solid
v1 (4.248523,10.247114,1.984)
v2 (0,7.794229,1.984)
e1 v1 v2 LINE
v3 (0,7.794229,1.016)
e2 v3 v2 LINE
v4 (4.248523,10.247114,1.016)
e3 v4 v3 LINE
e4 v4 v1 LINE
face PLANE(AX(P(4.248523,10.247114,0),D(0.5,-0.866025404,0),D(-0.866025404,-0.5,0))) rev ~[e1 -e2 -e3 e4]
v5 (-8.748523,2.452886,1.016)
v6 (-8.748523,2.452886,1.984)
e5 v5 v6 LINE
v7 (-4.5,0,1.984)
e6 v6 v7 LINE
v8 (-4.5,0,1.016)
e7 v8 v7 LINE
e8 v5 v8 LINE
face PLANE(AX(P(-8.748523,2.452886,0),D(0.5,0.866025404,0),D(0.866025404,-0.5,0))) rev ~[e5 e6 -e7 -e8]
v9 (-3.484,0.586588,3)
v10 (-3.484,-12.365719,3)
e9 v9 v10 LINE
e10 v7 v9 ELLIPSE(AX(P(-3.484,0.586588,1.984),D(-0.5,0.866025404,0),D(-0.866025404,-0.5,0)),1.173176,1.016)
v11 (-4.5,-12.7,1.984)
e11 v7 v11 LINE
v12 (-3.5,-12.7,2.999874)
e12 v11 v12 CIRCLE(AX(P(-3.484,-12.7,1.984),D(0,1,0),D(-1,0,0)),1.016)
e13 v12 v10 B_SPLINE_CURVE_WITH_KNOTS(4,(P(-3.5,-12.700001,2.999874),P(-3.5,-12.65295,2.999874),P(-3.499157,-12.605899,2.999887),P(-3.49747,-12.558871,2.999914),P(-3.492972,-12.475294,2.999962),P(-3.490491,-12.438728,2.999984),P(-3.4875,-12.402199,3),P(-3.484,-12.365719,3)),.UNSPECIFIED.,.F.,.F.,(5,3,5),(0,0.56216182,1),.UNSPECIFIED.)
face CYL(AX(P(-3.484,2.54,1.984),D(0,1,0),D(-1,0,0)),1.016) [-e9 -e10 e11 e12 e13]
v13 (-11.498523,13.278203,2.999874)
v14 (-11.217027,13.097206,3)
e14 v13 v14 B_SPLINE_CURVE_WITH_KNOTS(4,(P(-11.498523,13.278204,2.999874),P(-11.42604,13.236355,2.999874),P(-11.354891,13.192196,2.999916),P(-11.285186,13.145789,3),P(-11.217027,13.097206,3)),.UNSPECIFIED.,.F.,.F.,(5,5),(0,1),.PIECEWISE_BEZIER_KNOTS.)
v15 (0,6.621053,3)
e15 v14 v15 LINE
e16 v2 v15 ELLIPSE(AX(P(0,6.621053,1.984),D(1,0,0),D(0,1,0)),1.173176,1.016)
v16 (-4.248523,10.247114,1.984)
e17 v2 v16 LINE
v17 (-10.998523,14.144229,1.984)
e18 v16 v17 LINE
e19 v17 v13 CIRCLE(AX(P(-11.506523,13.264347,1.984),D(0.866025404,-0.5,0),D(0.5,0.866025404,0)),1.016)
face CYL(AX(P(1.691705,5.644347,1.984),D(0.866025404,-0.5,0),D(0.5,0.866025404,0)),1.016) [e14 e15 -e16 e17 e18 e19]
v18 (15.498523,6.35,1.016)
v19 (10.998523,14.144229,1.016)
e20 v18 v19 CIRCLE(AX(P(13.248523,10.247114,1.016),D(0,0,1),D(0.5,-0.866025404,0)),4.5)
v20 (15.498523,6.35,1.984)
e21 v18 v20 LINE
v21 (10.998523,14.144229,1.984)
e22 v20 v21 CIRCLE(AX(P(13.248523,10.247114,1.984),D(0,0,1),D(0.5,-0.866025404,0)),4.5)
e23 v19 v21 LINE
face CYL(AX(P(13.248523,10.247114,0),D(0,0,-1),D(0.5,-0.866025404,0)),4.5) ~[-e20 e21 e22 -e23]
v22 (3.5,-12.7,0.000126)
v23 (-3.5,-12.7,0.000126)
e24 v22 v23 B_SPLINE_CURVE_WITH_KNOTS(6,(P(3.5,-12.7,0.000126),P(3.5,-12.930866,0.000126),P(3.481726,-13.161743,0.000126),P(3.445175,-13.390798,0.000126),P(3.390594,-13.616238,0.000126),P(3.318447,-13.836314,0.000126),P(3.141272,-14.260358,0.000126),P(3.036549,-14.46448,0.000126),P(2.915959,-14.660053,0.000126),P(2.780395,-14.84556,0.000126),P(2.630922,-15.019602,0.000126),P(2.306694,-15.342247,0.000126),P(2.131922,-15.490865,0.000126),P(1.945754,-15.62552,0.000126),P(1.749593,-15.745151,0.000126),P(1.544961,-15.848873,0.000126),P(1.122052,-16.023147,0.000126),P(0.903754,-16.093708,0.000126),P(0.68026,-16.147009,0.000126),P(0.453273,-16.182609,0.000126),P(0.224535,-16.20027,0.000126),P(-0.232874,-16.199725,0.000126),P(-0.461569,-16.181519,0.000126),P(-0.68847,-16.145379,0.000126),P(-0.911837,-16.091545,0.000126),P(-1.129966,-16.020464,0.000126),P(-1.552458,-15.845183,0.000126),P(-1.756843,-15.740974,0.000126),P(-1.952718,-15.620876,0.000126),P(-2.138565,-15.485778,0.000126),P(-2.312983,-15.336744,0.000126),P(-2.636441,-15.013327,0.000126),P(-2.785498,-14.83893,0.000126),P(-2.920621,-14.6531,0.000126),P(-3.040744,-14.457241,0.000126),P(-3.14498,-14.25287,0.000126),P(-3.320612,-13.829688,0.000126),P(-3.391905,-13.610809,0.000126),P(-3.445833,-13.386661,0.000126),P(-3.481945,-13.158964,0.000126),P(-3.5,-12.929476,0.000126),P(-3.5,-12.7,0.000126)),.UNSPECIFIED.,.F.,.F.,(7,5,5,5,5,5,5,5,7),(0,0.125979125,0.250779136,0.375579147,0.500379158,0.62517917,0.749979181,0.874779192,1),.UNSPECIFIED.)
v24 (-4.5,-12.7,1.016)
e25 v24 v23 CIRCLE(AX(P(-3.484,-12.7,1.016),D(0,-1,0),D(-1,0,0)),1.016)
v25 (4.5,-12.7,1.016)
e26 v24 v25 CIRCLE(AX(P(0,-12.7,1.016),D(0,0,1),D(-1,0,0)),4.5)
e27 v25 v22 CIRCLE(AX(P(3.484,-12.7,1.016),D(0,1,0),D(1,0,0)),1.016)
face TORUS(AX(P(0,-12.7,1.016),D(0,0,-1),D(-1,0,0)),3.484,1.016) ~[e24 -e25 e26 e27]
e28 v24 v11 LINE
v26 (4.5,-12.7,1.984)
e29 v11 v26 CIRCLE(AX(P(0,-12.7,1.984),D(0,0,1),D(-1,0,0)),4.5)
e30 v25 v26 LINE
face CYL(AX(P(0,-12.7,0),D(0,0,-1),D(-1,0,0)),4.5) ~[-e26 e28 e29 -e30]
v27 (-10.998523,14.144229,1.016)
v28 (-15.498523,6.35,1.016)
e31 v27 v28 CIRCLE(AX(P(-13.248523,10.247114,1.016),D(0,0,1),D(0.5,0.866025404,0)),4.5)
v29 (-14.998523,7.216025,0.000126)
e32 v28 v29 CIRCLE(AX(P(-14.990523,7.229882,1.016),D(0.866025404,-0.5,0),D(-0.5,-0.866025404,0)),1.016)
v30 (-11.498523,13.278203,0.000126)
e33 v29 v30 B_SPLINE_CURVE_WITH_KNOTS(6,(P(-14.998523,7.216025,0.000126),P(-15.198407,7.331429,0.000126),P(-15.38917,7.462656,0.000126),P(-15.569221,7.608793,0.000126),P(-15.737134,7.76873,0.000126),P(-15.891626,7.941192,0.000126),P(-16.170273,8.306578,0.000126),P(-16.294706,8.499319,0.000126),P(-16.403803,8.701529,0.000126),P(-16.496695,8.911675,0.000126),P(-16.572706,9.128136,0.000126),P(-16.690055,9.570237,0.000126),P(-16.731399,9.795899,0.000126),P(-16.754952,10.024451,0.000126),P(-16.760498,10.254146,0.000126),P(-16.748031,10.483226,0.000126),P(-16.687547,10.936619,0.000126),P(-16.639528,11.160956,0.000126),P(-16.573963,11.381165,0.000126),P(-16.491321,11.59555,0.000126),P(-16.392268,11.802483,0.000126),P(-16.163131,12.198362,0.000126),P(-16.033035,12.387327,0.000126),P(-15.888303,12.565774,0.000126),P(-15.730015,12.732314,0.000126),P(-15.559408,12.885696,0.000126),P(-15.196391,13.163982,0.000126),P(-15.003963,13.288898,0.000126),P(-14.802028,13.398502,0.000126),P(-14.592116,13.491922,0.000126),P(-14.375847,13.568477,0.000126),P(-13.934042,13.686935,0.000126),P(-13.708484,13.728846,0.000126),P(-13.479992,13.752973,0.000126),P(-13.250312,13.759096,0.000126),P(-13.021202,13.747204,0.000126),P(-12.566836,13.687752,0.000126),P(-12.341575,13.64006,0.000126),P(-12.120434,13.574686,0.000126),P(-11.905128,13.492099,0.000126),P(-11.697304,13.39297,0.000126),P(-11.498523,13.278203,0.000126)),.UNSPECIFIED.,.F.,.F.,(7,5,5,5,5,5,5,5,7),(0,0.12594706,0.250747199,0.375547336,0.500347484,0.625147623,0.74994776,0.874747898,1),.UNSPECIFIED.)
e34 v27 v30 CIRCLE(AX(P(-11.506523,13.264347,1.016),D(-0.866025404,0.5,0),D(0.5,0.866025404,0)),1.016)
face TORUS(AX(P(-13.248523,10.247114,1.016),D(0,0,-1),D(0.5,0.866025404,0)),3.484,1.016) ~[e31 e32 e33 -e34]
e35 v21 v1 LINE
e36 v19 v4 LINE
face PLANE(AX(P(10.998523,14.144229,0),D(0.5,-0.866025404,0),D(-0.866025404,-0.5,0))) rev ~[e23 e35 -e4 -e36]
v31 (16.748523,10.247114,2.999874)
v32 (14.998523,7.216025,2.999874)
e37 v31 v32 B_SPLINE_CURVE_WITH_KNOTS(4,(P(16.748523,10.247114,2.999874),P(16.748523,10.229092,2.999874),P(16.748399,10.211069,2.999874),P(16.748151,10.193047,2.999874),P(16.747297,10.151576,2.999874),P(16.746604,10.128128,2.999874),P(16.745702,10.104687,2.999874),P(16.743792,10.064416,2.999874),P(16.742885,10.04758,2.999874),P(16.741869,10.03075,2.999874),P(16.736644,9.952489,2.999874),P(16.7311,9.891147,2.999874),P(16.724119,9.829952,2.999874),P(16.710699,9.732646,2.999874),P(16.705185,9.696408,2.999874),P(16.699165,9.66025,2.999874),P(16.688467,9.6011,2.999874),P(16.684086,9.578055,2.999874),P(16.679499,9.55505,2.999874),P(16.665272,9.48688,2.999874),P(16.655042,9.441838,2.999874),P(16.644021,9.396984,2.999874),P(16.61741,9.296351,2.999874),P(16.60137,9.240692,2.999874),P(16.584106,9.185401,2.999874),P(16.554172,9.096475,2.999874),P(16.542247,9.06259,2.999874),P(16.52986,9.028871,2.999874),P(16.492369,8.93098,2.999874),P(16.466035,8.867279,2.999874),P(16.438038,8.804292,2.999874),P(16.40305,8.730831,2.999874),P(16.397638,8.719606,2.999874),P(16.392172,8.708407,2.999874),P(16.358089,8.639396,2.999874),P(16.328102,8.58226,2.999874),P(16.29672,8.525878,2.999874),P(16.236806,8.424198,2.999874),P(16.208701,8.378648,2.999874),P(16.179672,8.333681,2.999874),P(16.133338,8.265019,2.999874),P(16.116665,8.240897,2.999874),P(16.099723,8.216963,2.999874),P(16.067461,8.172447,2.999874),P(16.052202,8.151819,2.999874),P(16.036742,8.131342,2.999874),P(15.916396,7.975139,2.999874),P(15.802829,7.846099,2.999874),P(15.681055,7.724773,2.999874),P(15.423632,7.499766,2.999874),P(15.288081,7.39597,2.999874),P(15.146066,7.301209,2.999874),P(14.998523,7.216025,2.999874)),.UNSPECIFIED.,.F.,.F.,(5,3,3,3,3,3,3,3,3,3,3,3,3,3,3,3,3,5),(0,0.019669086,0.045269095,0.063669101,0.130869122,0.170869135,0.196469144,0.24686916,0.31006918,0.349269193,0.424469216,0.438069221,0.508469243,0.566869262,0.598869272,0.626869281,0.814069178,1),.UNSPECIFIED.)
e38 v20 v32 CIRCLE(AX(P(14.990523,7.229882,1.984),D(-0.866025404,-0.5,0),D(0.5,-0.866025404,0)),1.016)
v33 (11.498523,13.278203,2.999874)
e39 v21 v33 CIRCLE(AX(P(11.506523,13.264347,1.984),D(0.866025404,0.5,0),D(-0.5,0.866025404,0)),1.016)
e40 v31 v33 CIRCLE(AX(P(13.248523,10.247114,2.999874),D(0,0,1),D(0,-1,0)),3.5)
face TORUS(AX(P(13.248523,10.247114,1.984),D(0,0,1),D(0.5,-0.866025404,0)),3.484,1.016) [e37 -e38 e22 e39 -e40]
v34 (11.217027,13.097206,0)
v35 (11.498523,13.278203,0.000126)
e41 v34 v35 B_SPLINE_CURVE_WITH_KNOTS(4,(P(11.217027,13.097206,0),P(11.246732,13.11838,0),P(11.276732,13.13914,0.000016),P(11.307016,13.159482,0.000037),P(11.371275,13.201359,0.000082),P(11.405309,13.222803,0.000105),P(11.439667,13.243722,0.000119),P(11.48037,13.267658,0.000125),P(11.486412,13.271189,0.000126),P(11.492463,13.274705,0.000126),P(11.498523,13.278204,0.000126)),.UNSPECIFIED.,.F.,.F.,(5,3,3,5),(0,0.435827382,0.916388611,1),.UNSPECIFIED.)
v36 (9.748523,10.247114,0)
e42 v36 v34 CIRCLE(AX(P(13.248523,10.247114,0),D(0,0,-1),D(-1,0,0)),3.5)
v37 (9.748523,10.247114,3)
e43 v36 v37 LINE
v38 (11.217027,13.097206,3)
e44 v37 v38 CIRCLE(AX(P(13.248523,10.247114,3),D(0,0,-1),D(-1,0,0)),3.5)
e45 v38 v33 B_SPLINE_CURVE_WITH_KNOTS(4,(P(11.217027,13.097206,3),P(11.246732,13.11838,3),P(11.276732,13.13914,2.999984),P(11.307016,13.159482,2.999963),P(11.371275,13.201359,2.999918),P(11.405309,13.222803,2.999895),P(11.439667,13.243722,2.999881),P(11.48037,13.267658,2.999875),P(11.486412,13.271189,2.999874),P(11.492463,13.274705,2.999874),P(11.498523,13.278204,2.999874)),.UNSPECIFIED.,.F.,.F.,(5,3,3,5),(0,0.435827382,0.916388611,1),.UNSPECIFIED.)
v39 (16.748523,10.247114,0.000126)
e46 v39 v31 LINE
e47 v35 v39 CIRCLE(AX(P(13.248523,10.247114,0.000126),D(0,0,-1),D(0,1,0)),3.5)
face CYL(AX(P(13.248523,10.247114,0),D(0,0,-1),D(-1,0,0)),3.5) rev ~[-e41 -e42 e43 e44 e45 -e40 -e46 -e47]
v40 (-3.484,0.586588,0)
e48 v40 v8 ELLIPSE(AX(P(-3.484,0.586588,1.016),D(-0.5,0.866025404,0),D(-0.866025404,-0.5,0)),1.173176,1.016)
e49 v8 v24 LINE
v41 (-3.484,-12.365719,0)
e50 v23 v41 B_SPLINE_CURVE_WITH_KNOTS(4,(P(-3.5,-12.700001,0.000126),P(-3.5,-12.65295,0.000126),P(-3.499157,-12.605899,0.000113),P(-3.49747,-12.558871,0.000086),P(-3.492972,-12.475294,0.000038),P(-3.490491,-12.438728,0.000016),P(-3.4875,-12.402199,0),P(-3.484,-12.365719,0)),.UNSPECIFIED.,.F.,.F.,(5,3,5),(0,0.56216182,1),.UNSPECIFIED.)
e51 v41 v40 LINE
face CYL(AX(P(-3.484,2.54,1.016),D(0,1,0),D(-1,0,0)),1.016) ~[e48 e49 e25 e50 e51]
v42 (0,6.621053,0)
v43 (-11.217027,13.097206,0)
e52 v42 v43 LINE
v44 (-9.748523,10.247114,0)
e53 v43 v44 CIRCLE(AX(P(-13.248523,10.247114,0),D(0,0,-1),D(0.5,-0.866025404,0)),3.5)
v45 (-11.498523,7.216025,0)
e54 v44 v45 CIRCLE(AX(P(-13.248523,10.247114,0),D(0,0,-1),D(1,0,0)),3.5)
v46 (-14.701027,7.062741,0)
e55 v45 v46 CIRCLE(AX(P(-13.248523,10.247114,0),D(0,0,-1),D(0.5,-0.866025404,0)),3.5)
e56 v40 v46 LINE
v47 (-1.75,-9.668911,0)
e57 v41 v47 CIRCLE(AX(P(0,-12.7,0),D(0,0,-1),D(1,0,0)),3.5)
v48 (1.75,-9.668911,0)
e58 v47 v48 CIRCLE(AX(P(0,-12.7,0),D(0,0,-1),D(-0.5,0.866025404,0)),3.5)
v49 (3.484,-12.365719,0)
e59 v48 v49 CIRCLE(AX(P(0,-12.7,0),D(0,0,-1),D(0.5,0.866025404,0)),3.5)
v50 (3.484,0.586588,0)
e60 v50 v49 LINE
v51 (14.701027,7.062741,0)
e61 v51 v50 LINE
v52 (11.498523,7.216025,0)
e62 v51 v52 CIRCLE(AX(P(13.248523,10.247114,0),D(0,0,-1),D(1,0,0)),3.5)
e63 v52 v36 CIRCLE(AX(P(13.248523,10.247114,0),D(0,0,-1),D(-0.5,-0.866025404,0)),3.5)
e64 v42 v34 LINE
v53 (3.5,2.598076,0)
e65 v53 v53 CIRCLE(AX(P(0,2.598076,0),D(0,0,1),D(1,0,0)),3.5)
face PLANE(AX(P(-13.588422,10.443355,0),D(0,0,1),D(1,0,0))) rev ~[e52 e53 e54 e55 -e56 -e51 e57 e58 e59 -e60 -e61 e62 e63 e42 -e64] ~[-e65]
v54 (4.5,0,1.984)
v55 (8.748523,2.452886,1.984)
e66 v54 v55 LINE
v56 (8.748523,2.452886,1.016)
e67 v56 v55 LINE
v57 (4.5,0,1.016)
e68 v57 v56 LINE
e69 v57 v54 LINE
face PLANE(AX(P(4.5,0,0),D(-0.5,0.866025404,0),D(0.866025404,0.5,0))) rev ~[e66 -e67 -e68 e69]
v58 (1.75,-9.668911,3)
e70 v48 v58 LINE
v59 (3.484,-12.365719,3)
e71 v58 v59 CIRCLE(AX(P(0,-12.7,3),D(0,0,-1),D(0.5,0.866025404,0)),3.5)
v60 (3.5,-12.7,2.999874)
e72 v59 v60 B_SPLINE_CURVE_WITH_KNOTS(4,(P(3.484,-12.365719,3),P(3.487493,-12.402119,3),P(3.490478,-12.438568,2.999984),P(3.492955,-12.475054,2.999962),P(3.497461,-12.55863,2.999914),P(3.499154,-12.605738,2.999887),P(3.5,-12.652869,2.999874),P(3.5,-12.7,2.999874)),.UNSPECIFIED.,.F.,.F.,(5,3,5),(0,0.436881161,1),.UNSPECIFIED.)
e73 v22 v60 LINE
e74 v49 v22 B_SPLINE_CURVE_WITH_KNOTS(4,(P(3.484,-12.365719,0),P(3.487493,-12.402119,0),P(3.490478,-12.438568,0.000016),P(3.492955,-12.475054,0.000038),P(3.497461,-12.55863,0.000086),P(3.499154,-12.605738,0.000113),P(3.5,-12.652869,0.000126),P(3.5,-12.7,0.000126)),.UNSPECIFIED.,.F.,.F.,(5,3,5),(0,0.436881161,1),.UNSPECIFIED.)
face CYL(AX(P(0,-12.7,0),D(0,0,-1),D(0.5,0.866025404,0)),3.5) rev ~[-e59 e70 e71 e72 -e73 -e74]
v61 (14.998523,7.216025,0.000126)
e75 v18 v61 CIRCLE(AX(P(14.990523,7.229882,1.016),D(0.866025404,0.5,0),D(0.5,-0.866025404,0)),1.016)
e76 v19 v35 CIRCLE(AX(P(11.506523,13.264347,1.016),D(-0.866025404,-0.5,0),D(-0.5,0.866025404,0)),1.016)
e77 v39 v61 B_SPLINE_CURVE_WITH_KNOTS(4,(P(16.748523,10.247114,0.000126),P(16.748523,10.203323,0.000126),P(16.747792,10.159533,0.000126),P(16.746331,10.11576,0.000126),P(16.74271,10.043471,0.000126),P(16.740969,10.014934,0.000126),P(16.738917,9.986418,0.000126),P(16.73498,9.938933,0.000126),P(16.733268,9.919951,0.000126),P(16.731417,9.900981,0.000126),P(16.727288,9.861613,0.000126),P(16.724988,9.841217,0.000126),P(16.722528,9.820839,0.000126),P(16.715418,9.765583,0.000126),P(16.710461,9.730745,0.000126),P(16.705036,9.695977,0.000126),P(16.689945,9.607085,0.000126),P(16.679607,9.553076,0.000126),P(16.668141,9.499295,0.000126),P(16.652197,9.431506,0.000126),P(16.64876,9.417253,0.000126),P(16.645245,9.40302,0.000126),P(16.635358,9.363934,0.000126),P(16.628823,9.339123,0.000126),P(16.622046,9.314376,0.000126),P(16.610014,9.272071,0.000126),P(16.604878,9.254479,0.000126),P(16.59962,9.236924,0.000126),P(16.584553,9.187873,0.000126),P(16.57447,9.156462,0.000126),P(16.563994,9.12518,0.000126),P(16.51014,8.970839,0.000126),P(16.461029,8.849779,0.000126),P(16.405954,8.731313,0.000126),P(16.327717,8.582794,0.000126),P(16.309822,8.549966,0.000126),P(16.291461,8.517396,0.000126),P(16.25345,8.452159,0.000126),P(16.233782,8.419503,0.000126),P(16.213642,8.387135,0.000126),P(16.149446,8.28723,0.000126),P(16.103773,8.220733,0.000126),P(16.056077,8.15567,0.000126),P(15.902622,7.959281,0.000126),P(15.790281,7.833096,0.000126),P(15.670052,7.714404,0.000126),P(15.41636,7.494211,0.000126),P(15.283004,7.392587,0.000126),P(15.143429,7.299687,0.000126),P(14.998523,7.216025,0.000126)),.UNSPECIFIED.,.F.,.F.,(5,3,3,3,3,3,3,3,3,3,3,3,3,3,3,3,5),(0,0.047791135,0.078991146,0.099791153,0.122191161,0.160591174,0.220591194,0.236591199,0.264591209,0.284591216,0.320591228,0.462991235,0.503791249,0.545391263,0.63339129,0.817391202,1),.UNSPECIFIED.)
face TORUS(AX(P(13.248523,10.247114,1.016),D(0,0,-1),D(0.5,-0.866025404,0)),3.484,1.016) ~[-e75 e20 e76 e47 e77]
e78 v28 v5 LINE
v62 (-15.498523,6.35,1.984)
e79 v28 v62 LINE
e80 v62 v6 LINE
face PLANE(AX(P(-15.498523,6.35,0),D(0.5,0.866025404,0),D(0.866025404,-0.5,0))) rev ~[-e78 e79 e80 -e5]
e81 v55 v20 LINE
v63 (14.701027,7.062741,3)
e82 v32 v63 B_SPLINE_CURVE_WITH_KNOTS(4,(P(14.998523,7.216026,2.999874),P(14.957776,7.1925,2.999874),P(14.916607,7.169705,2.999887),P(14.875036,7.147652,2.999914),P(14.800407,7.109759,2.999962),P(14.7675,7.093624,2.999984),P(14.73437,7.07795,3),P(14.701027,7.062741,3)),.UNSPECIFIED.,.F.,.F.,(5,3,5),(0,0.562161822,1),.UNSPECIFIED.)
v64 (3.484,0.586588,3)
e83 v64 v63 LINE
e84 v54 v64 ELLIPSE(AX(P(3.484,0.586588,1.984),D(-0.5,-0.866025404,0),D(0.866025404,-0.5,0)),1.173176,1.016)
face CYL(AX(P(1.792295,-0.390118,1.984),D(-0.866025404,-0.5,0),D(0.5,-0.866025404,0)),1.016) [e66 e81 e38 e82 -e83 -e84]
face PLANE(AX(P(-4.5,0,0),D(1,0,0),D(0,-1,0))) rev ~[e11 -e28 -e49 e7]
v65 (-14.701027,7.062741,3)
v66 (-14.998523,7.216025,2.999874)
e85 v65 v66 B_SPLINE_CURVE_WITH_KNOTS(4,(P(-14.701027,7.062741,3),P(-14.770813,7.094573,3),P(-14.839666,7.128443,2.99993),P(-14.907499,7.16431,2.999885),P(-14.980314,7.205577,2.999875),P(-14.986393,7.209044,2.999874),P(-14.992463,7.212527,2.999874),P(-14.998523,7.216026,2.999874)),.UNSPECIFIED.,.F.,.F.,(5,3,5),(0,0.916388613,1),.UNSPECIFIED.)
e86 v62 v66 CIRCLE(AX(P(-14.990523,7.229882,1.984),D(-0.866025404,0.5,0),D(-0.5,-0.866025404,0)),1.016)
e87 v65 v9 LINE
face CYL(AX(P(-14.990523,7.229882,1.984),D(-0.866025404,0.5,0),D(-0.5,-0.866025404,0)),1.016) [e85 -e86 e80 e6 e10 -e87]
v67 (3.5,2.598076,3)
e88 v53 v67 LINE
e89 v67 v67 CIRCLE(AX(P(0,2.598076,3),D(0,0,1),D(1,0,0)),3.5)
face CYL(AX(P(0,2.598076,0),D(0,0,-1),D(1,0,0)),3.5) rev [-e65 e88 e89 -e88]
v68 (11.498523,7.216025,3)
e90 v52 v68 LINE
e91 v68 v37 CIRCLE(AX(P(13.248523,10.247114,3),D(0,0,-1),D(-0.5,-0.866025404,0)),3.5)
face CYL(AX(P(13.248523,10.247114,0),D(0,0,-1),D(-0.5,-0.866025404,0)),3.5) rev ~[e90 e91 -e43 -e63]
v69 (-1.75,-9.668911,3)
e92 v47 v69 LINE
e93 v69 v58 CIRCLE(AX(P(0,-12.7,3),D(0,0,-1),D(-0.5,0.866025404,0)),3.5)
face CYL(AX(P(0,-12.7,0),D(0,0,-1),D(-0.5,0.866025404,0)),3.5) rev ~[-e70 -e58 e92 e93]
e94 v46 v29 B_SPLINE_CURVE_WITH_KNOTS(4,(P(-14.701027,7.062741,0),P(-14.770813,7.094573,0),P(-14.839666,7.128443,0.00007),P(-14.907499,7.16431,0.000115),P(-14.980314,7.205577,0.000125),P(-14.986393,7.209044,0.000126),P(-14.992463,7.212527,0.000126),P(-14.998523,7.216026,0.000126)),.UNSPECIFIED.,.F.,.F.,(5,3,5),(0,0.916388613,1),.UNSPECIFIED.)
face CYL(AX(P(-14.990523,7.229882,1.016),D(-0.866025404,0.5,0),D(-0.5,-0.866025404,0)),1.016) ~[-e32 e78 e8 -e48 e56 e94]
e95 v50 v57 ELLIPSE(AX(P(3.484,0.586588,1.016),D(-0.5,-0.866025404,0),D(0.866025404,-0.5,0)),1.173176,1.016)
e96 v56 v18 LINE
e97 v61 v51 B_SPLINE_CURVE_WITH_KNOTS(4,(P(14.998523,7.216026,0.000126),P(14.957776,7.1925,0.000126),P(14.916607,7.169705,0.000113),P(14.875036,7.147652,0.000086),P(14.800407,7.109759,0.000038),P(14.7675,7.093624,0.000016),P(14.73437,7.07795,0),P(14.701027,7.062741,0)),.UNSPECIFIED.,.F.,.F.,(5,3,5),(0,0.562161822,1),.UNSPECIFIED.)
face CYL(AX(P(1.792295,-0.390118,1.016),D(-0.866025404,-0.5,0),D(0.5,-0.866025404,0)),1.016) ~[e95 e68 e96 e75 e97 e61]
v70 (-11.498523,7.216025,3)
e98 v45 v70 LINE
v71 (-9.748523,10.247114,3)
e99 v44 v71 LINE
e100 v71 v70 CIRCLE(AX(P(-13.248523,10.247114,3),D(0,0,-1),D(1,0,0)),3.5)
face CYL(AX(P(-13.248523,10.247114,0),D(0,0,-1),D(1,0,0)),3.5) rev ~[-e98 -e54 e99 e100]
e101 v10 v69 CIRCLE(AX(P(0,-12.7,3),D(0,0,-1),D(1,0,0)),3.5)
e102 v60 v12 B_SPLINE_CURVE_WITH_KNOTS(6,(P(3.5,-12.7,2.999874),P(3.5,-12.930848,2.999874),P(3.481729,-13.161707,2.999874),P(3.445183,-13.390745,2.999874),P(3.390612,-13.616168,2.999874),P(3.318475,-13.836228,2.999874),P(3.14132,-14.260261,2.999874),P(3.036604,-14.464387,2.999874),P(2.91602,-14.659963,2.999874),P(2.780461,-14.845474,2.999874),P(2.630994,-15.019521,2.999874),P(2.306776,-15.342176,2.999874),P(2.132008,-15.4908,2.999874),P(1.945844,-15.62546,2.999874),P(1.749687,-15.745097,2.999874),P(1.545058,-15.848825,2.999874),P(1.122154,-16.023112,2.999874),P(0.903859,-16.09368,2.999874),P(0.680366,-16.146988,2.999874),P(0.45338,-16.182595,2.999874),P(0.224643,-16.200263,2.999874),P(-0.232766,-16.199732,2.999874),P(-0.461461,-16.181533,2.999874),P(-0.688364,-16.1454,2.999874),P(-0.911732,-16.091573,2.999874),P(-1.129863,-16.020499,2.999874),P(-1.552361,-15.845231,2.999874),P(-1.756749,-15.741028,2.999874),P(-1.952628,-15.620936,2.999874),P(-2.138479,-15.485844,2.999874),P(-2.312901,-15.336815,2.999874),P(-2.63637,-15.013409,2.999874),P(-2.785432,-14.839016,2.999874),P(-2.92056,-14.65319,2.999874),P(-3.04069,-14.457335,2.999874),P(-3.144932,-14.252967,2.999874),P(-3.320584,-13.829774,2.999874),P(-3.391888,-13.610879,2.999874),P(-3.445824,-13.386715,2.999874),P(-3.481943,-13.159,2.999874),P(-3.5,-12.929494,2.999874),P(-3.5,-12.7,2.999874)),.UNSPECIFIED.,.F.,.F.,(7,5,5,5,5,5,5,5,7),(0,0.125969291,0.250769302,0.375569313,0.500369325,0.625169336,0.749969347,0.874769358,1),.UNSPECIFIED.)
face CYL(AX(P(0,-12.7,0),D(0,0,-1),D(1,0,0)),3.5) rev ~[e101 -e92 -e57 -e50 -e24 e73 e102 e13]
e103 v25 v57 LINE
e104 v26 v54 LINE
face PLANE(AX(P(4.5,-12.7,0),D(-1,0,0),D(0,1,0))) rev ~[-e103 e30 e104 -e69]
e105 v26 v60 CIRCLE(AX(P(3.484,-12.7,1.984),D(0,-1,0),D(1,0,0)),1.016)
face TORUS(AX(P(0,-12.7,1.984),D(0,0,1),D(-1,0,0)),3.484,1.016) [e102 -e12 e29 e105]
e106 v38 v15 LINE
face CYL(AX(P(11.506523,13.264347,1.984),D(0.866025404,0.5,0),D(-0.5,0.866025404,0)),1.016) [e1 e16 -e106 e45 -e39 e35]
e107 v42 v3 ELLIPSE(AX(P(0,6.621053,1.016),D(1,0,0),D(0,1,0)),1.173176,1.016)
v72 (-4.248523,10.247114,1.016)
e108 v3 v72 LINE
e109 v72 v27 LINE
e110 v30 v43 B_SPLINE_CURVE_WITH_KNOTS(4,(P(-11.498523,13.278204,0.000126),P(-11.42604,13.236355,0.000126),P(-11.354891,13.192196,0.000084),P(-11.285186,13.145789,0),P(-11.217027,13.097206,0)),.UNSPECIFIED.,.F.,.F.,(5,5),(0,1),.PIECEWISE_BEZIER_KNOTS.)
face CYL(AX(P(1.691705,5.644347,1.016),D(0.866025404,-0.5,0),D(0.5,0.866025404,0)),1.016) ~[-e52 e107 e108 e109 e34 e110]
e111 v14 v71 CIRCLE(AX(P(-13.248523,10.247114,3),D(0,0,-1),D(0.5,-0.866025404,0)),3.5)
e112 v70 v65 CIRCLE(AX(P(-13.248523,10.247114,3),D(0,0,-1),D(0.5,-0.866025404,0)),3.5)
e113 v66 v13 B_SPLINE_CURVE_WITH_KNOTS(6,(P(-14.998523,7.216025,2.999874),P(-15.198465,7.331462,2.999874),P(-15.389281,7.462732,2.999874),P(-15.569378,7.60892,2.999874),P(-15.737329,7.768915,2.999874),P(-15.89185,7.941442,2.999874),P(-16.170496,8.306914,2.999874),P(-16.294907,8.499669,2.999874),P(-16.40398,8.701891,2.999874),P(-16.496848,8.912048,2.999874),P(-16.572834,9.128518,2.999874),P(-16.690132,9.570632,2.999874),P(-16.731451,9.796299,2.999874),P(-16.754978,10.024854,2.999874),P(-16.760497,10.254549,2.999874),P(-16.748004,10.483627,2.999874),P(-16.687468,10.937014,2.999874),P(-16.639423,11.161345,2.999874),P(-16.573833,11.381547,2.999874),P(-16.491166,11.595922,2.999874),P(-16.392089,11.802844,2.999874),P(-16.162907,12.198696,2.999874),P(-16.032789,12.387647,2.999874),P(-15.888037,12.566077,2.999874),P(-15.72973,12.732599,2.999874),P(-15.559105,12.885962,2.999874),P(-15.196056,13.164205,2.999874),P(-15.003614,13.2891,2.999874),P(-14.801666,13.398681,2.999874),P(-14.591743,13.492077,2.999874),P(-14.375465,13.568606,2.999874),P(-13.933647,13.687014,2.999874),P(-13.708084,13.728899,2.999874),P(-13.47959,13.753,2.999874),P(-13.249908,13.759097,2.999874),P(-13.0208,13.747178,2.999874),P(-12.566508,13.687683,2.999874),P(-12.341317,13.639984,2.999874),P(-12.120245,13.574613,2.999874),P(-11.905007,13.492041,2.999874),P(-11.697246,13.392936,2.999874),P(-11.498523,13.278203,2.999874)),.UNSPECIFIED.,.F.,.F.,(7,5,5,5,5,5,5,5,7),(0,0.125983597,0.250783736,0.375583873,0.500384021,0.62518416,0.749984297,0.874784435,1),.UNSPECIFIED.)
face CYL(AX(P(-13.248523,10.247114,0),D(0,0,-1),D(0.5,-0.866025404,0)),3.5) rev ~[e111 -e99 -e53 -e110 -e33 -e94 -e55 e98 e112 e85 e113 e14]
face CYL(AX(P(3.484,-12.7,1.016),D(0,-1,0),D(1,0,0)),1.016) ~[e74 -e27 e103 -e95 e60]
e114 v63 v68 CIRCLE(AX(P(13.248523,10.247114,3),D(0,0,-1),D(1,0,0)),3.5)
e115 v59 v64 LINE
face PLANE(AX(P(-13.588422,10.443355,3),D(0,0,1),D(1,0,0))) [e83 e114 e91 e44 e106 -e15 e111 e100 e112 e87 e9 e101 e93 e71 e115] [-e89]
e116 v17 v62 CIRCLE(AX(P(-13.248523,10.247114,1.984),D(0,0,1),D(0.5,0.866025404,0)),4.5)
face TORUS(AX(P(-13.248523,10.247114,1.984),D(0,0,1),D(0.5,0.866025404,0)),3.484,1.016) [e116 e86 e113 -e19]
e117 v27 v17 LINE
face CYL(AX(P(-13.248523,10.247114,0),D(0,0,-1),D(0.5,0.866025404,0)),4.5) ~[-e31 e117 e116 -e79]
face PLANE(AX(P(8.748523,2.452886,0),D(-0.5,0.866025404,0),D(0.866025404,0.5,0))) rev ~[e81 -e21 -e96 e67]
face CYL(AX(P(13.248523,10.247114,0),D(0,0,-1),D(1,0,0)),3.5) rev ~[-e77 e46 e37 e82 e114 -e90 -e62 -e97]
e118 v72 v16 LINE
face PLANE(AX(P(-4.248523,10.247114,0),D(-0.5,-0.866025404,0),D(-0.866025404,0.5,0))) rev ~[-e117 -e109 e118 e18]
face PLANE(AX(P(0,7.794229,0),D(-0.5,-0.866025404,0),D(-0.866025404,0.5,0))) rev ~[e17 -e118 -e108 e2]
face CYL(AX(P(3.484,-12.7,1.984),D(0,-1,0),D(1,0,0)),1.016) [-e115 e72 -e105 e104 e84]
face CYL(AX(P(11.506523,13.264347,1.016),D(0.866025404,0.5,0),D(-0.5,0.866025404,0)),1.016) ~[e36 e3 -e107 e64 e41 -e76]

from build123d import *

# Parameters (mm, degrees)
F0_R          = 3.5
F1_DEPTH      = 3
F2_T4_DEPTH   = 15.24
F2_T9_DEPTH   = 15.24
F2_T14_DEPTH  = 15.24
F2_T19_DEPTH  = 15.24
F2_T24_DEPTH  = 15.24
F2_T29_DEPTH  = 15.24
F2_T32_ANGLE  = 180
F2_T34_ANGLE  = 180
F2_T36_ANGLE  = 180
F2_T40_DEPTH  = 15.24
F2_T45_DEPTH  = 15.24
F2_T50_DEPTH  = 15.24
F2_T55_DEPTH  = 15.24
F2_T58_ANGLE  = 180
F2_T62_DEPTH  = 15.24
F2_T65_ANGLE  = 180
F2_T67_ANGLE  = 180
F2_T71_DEPTH  = 15.24
F2_T77_DEPTH  = 15.24
F2_T81_DEPTH  = 15.24
F2_T88_DEPTH  = 15.24
F2_T92_DEPTH  = 15.24
F2_T99_DEPTH  = 15.24
F2_T103_DEPTH = 15.24
F2_T110_DEPTH = 15.24
F2_T114_DEPTH = 15.24
F2_T121_DEPTH = 15.24
F2_T125_DEPTH = 15.24
F2_T132_DEPTH = 15.24
F2_T136_DEPTH = 15.24


# Not quite as in the source:
# - a fillet or chamfer that OpenCascade refuses, or shapes differently, is made with other operations: its cross-section is extruded or revolved along the edge and cut away or added


with BuildPart() as f1:
    # F0 (on Top) → F1 (new body)
    with BuildSketch(Plane.XY):
        with BuildLine():
            Line((-9.7485226281, 10.247114317), (-8.7485226281, 10.247114317))
            ThreePointArc((-8.7485226281, 10.247114317), (-9.351408311, 12.497114317), (-10.9985226281, 14.1442286341))
            ThreePointArc((-10.9985226281, 14.1442286341), (-17.1456369451, 12.497114317), (-15.4985226281, 6.35))
            ThreePointArc((-15.4985226281, 6.35), (-13.2485226281, 5.747114317), (-10.9985226281, 6.35))
            Line((-10.9985226281, 6.35), (-11.4985226281, 7.2160254038))
            ThreePointArc((-11.4985226281, 7.2160254038), (-16.2796115413, 11.997114317), (-9.7485226281, 10.247114317))
        make_face()
        with BuildLine():
            ThreePointArc((-10.9985226281, 6.35), (-9.351408311, 7.997114317), (-8.7485226281, 10.247114317))
            Line((-8.7485226281, 10.247114317), (-9.7485226281, 10.247114317))
            ThreePointArc((-9.7485226281, 10.247114317), (-10.2174337148, 8.497114317), (-11.4985226281, 7.2160254038))
            Line((-11.4985226281, 7.2160254038), (-10.9985226281, 6.35))
        make_face()
        with BuildLine():
            Line((9.7485226281, 10.247114317), (8.7485226281, 10.247114317))
            ThreePointArc((8.7485226281, 10.247114317), (9.351408311, 7.997114317), (10.9985226281, 6.35))
            Line((10.9985226281, 6.35), (11.4985226281, 7.2160254038))
            ThreePointArc((11.4985226281, 7.2160254038), (10.2174337148, 8.497114317), (9.7485226281, 10.247114317))
        make_face()
        with BuildLine():
            ThreePointArc((17.7485226281, 10.247114317), (15.4985226281, 14.1442286341), (10.9985226281, 14.1442286341))
            ThreePointArc((10.9985226281, 14.1442286341), (9.351408311, 12.497114317), (8.7485226281, 10.247114317))
            Line((8.7485226281, 10.247114317), (9.7485226281, 10.247114317))
            ThreePointArc((9.7485226281, 10.247114317), (13.2485226281, 13.747114317), (16.7485226281, 10.247114317))
            ThreePointArc((16.7485226281, 10.247114317), (14.9985226281, 7.2160254038), (11.4985226281, 7.2160254038))
            Line((11.4985226281, 7.2160254038), (10.9985226281, 6.35))
            ThreePointArc((10.9985226281, 6.35), (13.2485226281, 5.747114317), (15.4985226281, 6.35))
            ThreePointArc((15.4985226281, 6.35), (17.1456369451, 7.997114317), (17.7485226281, 10.247114317))
        make_face()
        with BuildLine():
            ThreePointArc((2.25, -8.802885683), (0, -8.2), (-2.25, -8.802885683))
            Line((-2.25, -8.802885683), (-1.75, -9.6689110868))
            ThreePointArc((-1.75, -9.6689110868), (0, -9.2), (1.75, -9.6689110868))
            Line((1.75, -9.6689110868), (2.25, -8.802885683))
        make_face()
        with BuildLine():
            ThreePointArc((-2.25, -8.802885683), (-3.897114317, -10.45), (-4.5, -12.7))
            ThreePointArc((-4.5, -12.7), (0, -17.2), (4.5, -12.7))
            ThreePointArc((4.5, -12.7), (3.897114317, -10.45), (2.25, -8.802885683))
            Line((2.25, -8.802885683), (1.75, -9.6689110868))
            ThreePointArc((1.75, -9.6689110868), (3.0310889132, -10.95), (3.5, -12.7))
            ThreePointArc((3.5, -12.7), (-1.75, -15.7310889132), (-1.75, -9.6689110868))
            Line((-1.75, -9.6689110868), (-2.25, -8.802885683))
        make_face()
        with BuildLine():
            Line((-4.2485226281, 10.247114317), (-8.7485226281, 10.247114317))
            ThreePointArc((-8.7485226281, 10.247114317), (-9.351408311, 7.997114317), (-10.9985226281, 6.35))
            Line((-10.9985226281, 6.35), (-8.7485226281, 2.452885683))
            Line((-8.7485226281, 2.452885683), (-4.5, 0))
            Line((-4.5, 0), (-4.5, -4.9057713659))
            Line((-4.5, -4.9057713659), (-2.25, -8.802885683))
            ThreePointArc((-2.25, -8.802885683), (0, -8.2), (2.25, -8.802885683))
            Line((2.25, -8.802885683), (4.5, -4.9057713659))
            Line((4.5, -4.9057713659), (4.5, 0))
            Line((4.5, 0), (8.7485226281, 2.452885683))
            Line((8.7485226281, 2.452885683), (10.9985226281, 6.35))
            ThreePointArc((10.9985226281, 6.35), (9.351408311, 7.997114317), (8.7485226281, 10.247114317))
            Line((8.7485226281, 10.247114317), (4.2485226281, 10.247114317))
            Line((4.2485226281, 10.247114317), (0, 7.7942286341))
            Line((0, 7.7942286341), (-4.2485226281, 10.247114317))
        make_face()
        with Locations((0, 2.5980762114)):
            Circle(F0_R, mode=Mode.SUBTRACT)
        with BuildLine():
            Line((-2.25, -8.802885683), (-4.5, -4.9057713659))
            Line((-4.5, -4.9057713659), (-4.5, -12.7))
            ThreePointArc((-4.5, -12.7), (-3.897114317, -10.45), (-2.25, -8.802885683))
        make_face()
        with BuildLine():
            ThreePointArc((2.25, -8.802885683), (3.897114317, -10.45), (4.5, -12.7))
            Line((4.5, -12.7), (4.5, -4.9057713659))
            Line((4.5, -4.9057713659), (2.25, -8.802885683))
        make_face()
        with BuildLine():
            ThreePointArc((15.4985226281, 6.35), (13.2485226281, 5.747114317), (10.9985226281, 6.35))
            Line((10.9985226281, 6.35), (8.7485226281, 2.452885683))
            Line((8.7485226281, 2.452885683), (15.4985226281, 6.35))
        make_face()
        with BuildLine():
            Line((10.9985226281, 14.1442286341), (4.2485226281, 10.247114317))
            Line((4.2485226281, 10.247114317), (8.7485226281, 10.247114317))
            ThreePointArc((8.7485226281, 10.247114317), (9.351408311, 12.497114317), (10.9985226281, 14.1442286341))
        make_face()
        with BuildLine():
            ThreePointArc((-10.9985226281, 14.1442286341), (-9.351408311, 12.497114317), (-8.7485226281, 10.247114317))
            Line((-8.7485226281, 10.247114317), (-4.2485226281, 10.247114317))
            Line((-4.2485226281, 10.247114317), (-10.9985226281, 14.1442286341))
        make_face()
        with BuildLine():
            Line((-8.7485226281, 2.452885683), (-10.9985226281, 6.35))
            ThreePointArc((-10.9985226281, 6.35), (-13.2485226281, 5.747114317), (-15.4985226281, 6.35))
            Line((-15.4985226281, 6.35), (-8.7485226281, 2.452885683))
        make_face()
    extrude(amount=F1_DEPTH)

    # F2: fillet of radius 1.016 on 18 edges, made by hand


with BuildPart() as f2_tool2:
    # F2_s3 → F2_t4 (new body)
    with BuildSketch(Plane(origin=(14.3735226281, 8.2985571585, 0), x_dir=(0, 0, 1), z_dir=(-0.8660254038, -0.5, 0))):
        with BuildLine():
            ThreePointArc((1.984, 6.75), (2.7024204897, 6.4524204897), (3, 5.734))
            Line((3, 5.734), (3, 6.75))
            Line((3, 6.75), (1.984, 6.75))
        make_face()
    extrude(amount=F2_T4_DEPTH)

    split(bisect_by=Plane(origin=(3.375, 5.8456714755, 0), x_dir=(0, 0, 1), z_dir=(0.5, 0.8660254038, 0)), keep=Keep.TOP)


with BuildPart() as f1_1:
    add(f1.part)

    # F2_t1: cut F2_tool2
    add(f2_tool2.part, mode=Mode.SUBTRACT)


with BuildPart() as f2_tool7:
    # F2_s8 → F2_t9 (new body)
    with BuildSketch(Plane(origin=(1.1752954744, 0.6785571585, 0), x_dir=(0, 0, 1), z_dir=(0.8660254038, 0.5, 0))):
        with BuildLine():
            ThreePointArc((1.984, 2.25), (2.7024204897, 1.9524204897), (3, 1.234))
            Line((3, 1.234), (3, 2.25))
            Line((3, 2.25), (1.984, 2.25))
        make_face()
    extrude(amount=F2_T9_DEPTH)

    split(bisect_by=Plane.YZ.offset(4.5), keep=Keep.TOP)


with BuildPart() as f1_2:
    add(f1_1.part)

    # F2_t6: cut F2_tool7
    add(f2_tool7.part, mode=Mode.SUBTRACT)


with BuildPart() as f2_tool12:
    # F2_s13 → F2_t14 (new body)
    with BuildSketch(Plane(origin=(-1.1752954744, 0.6785571585, 0), x_dir=(0, 0, 1), z_dir=(-0.8660254038, 0.5, 0))):
        with BuildLine():
            ThreePointArc((1.984, 6.75), (2.7024204897, 6.4524204897), (3, 5.734))
            Line((3, 5.734), (3, 6.75))
            Line((3, 6.75), (1.984, 6.75))
        make_face()
    extrude(amount=F2_T14_DEPTH)

    split(bisect_by=Plane(origin=(-3.375, 5.8456714755, 0), x_dir=(0, 0, 1), z_dir=(-0.5, 0.8660254038, 0)), keep=Keep.TOP)


with BuildPart() as f1_3:
    add(f1_2.part)

    # F2_t11: cut F2_tool12
    add(f2_tool12.part, mode=Mode.SUBTRACT)


with BuildPart() as f2_tool17:
    # F2_s18 → F2_t19 (new body)
    with BuildSketch(Plane(origin=(-14.3735226281, 8.2985571585, 0), x_dir=(0, 0, 1), z_dir=(0.8660254038, -0.5, 0))):
        with BuildLine():
            ThreePointArc((1.984, 2.25), (2.7024204897, 1.9524204897), (3, 1.234))
            Line((3, 1.234), (3, 2.25))
            Line((3, 2.25), (1.984, 2.25))
        make_face()
    extrude(amount=F2_T19_DEPTH)

    split(bisect_by=Plane.YZ.offset(-4.5), keep=Keep.BOTTOM)


with BuildPart() as f1_4:
    add(f1_3.part)

    # F2_t16: cut F2_tool17
    add(f2_tool17.part, mode=Mode.SUBTRACT)


with BuildPart() as f2_tool22:
    # F2_s23 → F2_t24 (new body)
    with BuildSketch(Plane.XZ.offset(-2.54)):
        with BuildLine():
            ThreePointArc((-4.5, 1.984), (-4.2024204897, 2.7024204897), (-3.484, 3))
            Line((-3.484, 3), (-4.5, 3))
            Line((-4.5, 3), (-4.5, 1.984))
        make_face()
    extrude(amount=F2_T24_DEPTH)

    split(bisect_by=Plane(origin=(-1.125, -1.9485571585, 0), x_dir=(0, 0, 1), z_dir=(-0.5, -0.8660254038, 0)), keep=Keep.TOP)


with BuildPart() as f1_5:
    add(f1_4.part)

    # F2_t21: cut F2_tool22
    add(f2_tool22.part, mode=Mode.SUBTRACT)


with BuildPart() as f2_tool27:
    # F2_s28 → F2_t29 (new body)
    with BuildSketch(Plane.XZ.offset(12.7)):
        with BuildLine():
            ThreePointArc((4.5, 1.984), (4.2024204897, 2.7024204897), (3.484, 3))
            Line((3.484, 3), (4.5, 3))
            Line((4.5, 3), (4.5, 1.984))
        make_face()
    extrude(amount=-F2_T29_DEPTH)

    split(bisect_by=Plane(origin=(1.125, -1.9485571585, 0), x_dir=(0, 0, 1), z_dir=(0.5, -0.8660254038, 0)), keep=Keep.TOP)


with BuildPart() as f1_6:
    add(f1_5.part)

    # F2_t26: cut F2_tool27
    add(f2_tool27.part, mode=Mode.SUBTRACT)

    # F2_s31 → F2_t32 (revolve, cut)
    with BuildSketch(Plane.XZ.offset(12.7)):
        with BuildLine():
            ThreePointArc((-4.5, 1.984), (-4.2024204897, 2.7024204897), (-3.484, 3))
            Line((-3.484, 3), (-4.5, 3))
            Line((-4.5, 3), (-4.5, 1.984))
        make_face()
    revolve(axis=Axis((0, -12.7, 3), (0, 0, 1)), revolution_arc=F2_T32_ANGLE, mode=Mode.SUBTRACT)

    # F2_s33 → F2_t34 (revolve, cut)
    with BuildSketch(Plane(origin=(-14.3735226281, 8.2985571585, 0), x_dir=(0, 0, 1), z_dir=(0.8660254038, -0.5, 0))):
        with BuildLine():
            ThreePointArc((1.984, -6.75), (2.7024204897, -6.4524204897), (3, -5.734))
            Line((3, -5.734), (3, -6.75))
            Line((3, -6.75), (1.984, -6.75))
        make_face()
    revolve(axis=Axis((-13.2485226281, 10.247114317, 3), (0, 0, 1)), revolution_arc=F2_T34_ANGLE, mode=Mode.SUBTRACT)

    # F2_s35 → F2_t36 (revolve, cut)
    with BuildSketch(Plane(origin=(14.3735226281, 8.2985571585, 0), x_dir=(0, 0, 1), z_dir=(-0.8660254038, -0.5, 0))):
        with BuildLine():
            ThreePointArc((1.984, -2.25), (2.7024204897, -1.9524204897), (3, -1.234))
            Line((3, -1.234), (3, -2.25))
            Line((3, -2.25), (1.984, -2.25))
        make_face()
    revolve(axis=Axis((13.2485226281, 10.247114317, 3), (0, 0, 1)), revolution_arc=F2_T36_ANGLE, mode=Mode.SUBTRACT)


with BuildPart() as f2_tool38:
    # F2_s39 → F2_t40 (new body)
    with BuildSketch(Plane(origin=(-14.3735226281, 8.2985571585, 0), x_dir=(0, 0, 1), z_dir=(0.8660254038, -0.5, 0))):
        with BuildLine():
            ThreePointArc((1.016, 2.25), (0.2975795103, 1.9524204897), (0, 1.234))
            Line((0, 1.234), (0, 2.25))
            Line((0, 2.25), (1.016, 2.25))
        make_face()
    extrude(amount=F2_T40_DEPTH)

    split(bisect_by=Plane.YZ.offset(-4.5), keep=Keep.BOTTOM)


with BuildPart() as f1_7:
    add(f1_6.part)

    # F2_t37: cut F2_tool38
    add(f2_tool38.part, mode=Mode.SUBTRACT)


with BuildPart() as f2_tool43:
    # F2_s44 → F2_t45 (new body)
    with BuildSketch(Plane.XZ.offset(-2.54)):
        with BuildLine():
            ThreePointArc((-4.5, 1.016), (-4.2024204897, 0.2975795103), (-3.484, 0))
            Line((-3.484, 0), (-4.5, 0))
            Line((-4.5, 0), (-4.5, 1.016))
        make_face()
    extrude(amount=F2_T45_DEPTH)

    split(bisect_by=Plane(origin=(-1.125, -1.9485571585, 0), x_dir=(0, 0, 1), z_dir=(-0.5, -0.8660254038, 0)), keep=Keep.TOP)


with BuildPart() as f1_8:
    add(f1_7.part)

    # F2_t42: cut F2_tool43
    add(f2_tool43.part, mode=Mode.SUBTRACT)


with BuildPart() as f2_tool48:
    # F2_s49 → F2_t50 (new body)
    with BuildSketch(Plane.XZ.offset(12.7)):
        with BuildLine():
            ThreePointArc((4.5, 1.016), (4.2024204897, 0.2975795103), (3.484, 0))
            Line((3.484, 0), (4.5, 0))
            Line((4.5, 0), (4.5, 1.016))
        make_face()
    extrude(amount=-F2_T50_DEPTH)

    split(bisect_by=Plane(origin=(1.125, -1.9485571585, 0), x_dir=(0, 0, 1), z_dir=(0.5, -0.8660254038, 0)), keep=Keep.TOP)


with BuildPart() as f1_9:
    add(f1_8.part)

    # F2_t47: cut F2_tool48
    add(f2_tool48.part, mode=Mode.SUBTRACT)


with BuildPart() as f2_tool53:
    # F2_s54 → F2_t55 (new body)
    with BuildSketch(Plane(origin=(1.1752954744, 0.6785571585, 0), x_dir=(0, 0, 1), z_dir=(0.8660254038, 0.5, 0))):
        with BuildLine():
            ThreePointArc((1.016, 2.25), (0.2975795103, 1.9524204897), (0, 1.234))
            Line((0, 1.234), (0, 2.25))
            Line((0, 2.25), (1.016, 2.25))
        make_face()
    extrude(amount=F2_T55_DEPTH)

    split(bisect_by=Plane.YZ.offset(4.5), keep=Keep.TOP)


with BuildPart() as f1_10:
    add(f1_9.part)

    # F2_t52: cut F2_tool53
    add(f2_tool53.part, mode=Mode.SUBTRACT)

    # F2_s57 → F2_t58 (revolve, cut)
    with BuildSketch(Plane(origin=(14.3735226281, 8.2985571585, 0), x_dir=(0, 0, 1), z_dir=(-0.8660254038, -0.5, 0))):
        with BuildLine():
            ThreePointArc((1.016, -2.25), (0.2975795103, -1.9524204897), (0, -1.234))
            Line((0, -1.234), (0, -2.25))
            Line((0, -2.25), (1.016, -2.25))
        make_face()
    revolve(axis=Axis((13.2485226281, 10.247114317, 0), (0, 0, 1)), revolution_arc=F2_T58_ANGLE, mode=Mode.SUBTRACT)


with BuildPart() as f2_tool60:
    # F2_s61 → F2_t62 (new body)
    with BuildSketch(Plane(origin=(14.3735226281, 8.2985571585, 0), x_dir=(0, 0, 1), z_dir=(-0.8660254038, -0.5, 0))):
        with BuildLine():
            ThreePointArc((1.016, 6.75), (0.2975795103, 6.4524204897), (0, 5.734))
            Line((0, 5.734), (0, 6.75))
            Line((0, 6.75), (1.016, 6.75))
        make_face()
    extrude(amount=F2_T62_DEPTH)

    split(bisect_by=Plane(origin=(3.375, 5.8456714755, 0), x_dir=(0, 0, 1), z_dir=(0.5, 0.8660254038, 0)), keep=Keep.TOP)


with BuildPart() as f1_11:
    add(f1_10.part)

    # F2_t59: cut F2_tool60
    add(f2_tool60.part, mode=Mode.SUBTRACT)

    # F2_s64 → F2_t65 (revolve, cut)
    with BuildSketch(Plane.XZ.offset(12.7)):
        with BuildLine():
            ThreePointArc((-4.5, 1.016), (-4.2024204897, 0.2975795103), (-3.484, 0))
            Line((-3.484, 0), (-4.5, 0))
            Line((-4.5, 0), (-4.5, 1.016))
        make_face()
    revolve(axis=Axis((0, -12.7, 0), (0, 0, 1)), revolution_arc=F2_T65_ANGLE, mode=Mode.SUBTRACT)

    # F2_s66 → F2_t67 (revolve, cut)
    with BuildSketch(Plane(origin=(-14.3735226281, 8.2985571585, 0), x_dir=(0, 0, 1), z_dir=(0.8660254038, -0.5, 0))):
        with BuildLine():
            ThreePointArc((1.016, -6.75), (0.2975795103, -6.4524204897), (0, -5.734))
            Line((0, -5.734), (0, -6.75))
            Line((0, -6.75), (1.016, -6.75))
        make_face()
    revolve(axis=Axis((-13.2485226281, 10.247114317, 0), (0, 0, 1)), revolution_arc=F2_T67_ANGLE, mode=Mode.SUBTRACT)


with BuildPart() as f2_tool69:
    # F2_s70 → F2_t71 (new body)
    with BuildSketch(Plane(origin=(-1.1752954744, 0.6785571585, 0), x_dir=(0, 0, 1), z_dir=(-0.8660254038, 0.5, 0))):
        with BuildLine():
            ThreePointArc((1.016, 6.75), (0.2975795103, 6.4524204897), (0, 5.734))
            Line((0, 5.734), (0, 6.75))
            Line((0, 6.75), (1.016, 6.75))
        make_face()
    extrude(amount=F2_T71_DEPTH)

    split(bisect_by=Plane(origin=(-3.375, 5.8456714755, 0), x_dir=(0, 0, 1), z_dir=(-0.5, 0.8660254038, 0)), keep=Keep.TOP)


with BuildPart() as f1_12:
    add(f1_11.part)

    # F2_t68: cut F2_tool69
    add(f2_tool69.part, mode=Mode.SUBTRACT)


with BuildPart() as f2_tool75:
    # F2_s76 → F2_t77 (new body)
    with BuildSketch(Plane(origin=(14.3735226281, 8.2985571585, 0), x_dir=(0, 0, 1), z_dir=(-0.8660254038, -0.5, 0))):
        with BuildLine():
            ThreePointArc((1.984, 6.75), (2.7024204897, 6.4524204897), (3, 5.734))
            Line((3, 5.734), (3, 6.75))
            Line((3, 6.75), (1.984, 6.75))
        make_face()
    extrude(amount=F2_T77_DEPTH)

    split(bisect_by=Plane(origin=(3.375, 5.8456714755, 0), x_dir=(0, 0, 1), z_dir=(-0.5, -0.8660254038, 0)), keep=Keep.TOP)


with BuildPart() as f2_tool79:
    # F2_s80 → F2_t81 (new body)
    with BuildSketch(Plane(origin=(-1.1752954744, 0.6785571585, 0), x_dir=(0, 0, 1), z_dir=(-0.8660254038, 0.5, 0))):
        with BuildLine():
            ThreePointArc((1.984, 6.75), (2.7024204897, 6.4524204897), (3, 5.734))
            Line((3, 5.734), (3, 6.75))
            Line((3, 6.75), (1.984, 6.75))
        make_face()
    extrude(amount=F2_T81_DEPTH)

    split(bisect_by=Plane(origin=(-3.375, 5.8456714755, 0), x_dir=(0, 0, 1), z_dir=(0.5, -0.8660254038, 0)), keep=Keep.TOP)


with BuildPart() as f2_tool75_1:
    add(f2_tool75.part)

    # F2_t83: intersect F2_tool79
    add(f2_tool79.part, mode=Mode.INTERSECT)


with BuildPart() as f1_13:
    add(f1_12.part)

    # F2_t73: cut F2_tool75
    add(f2_tool75_1.part, mode=Mode.SUBTRACT)


with BuildPart() as f2_tool86:
    # F2_s87 → F2_t88 (new body)
    with BuildSketch(Plane.XZ.offset(12.7)):
        with BuildLine():
            ThreePointArc((4.5, 1.984), (4.2024204897, 2.7024204897), (3.484, 3))
            Line((3.484, 3), (4.5, 3))
            Line((4.5, 3), (4.5, 1.984))
        make_face()
    extrude(amount=-F2_T88_DEPTH)

    split(bisect_by=Plane(origin=(1.125, -1.9485571585, 0), x_dir=(0, 0, 1), z_dir=(-0.5, 0.8660254038, 0)), keep=Keep.TOP)


with BuildPart() as f2_tool90:
    # F2_s91 → F2_t92 (new body)
    with BuildSketch(Plane(origin=(1.1752954744, 0.6785571585, 0), x_dir=(0, 0, 1), z_dir=(0.8660254038, 0.5, 0))):
        with BuildLine():
            ThreePointArc((1.984, 2.25), (2.7024204897, 1.9524204897), (3, 1.234))
            Line((3, 1.234), (3, 2.25))
            Line((3, 2.25), (1.984, 2.25))
        make_face()
    extrude(amount=F2_T92_DEPTH)

    split(bisect_by=Plane.YZ.offset(4.5), keep=Keep.BOTTOM)


with BuildPart() as f2_tool86_1:
    add(f2_tool86.part)

    # F2_t94: intersect F2_tool90
    add(f2_tool90.part, mode=Mode.INTERSECT)


with BuildPart() as f1_14:
    add(f1_13.part)

    # F2_t84: cut F2_tool86
    add(f2_tool86_1.part, mode=Mode.SUBTRACT)


with BuildPart() as f2_tool97:
    # F2_s98 → F2_t99 (new body)
    with BuildSketch(Plane(origin=(-14.3735226281, 8.2985571585, 0), x_dir=(0, 0, 1), z_dir=(0.8660254038, -0.5, 0))):
        with BuildLine():
            ThreePointArc((1.984, 2.25), (2.7024204897, 1.9524204897), (3, 1.234))
            Line((3, 1.234), (3, 2.25))
            Line((3, 2.25), (1.984, 2.25))
        make_face()
    extrude(amount=F2_T99_DEPTH)

    split(bisect_by=Plane.YZ.offset(-4.5), keep=Keep.TOP)


with BuildPart() as f2_tool101:
    # F2_s102 → F2_t103 (new body)
    with BuildSketch(Plane.XZ.offset(-2.54)):
        with BuildLine():
            ThreePointArc((-4.5, 1.984), (-4.2024204897, 2.7024204897), (-3.484, 3))
            Line((-3.484, 3), (-4.5, 3))
            Line((-4.5, 3), (-4.5, 1.984))
        make_face()
    extrude(amount=F2_T103_DEPTH)

    split(bisect_by=Plane(origin=(-1.125, -1.9485571585, 0), x_dir=(0, 0, 1), z_dir=(0.5, 0.8660254038, 0)), keep=Keep.TOP)


with BuildPart() as f2_tool97_1:
    add(f2_tool97.part)

    # F2_t105: intersect F2_tool101
    add(f2_tool101.part, mode=Mode.INTERSECT)


with BuildPart() as f1_15:
    add(f1_14.part)

    # F2_t95: cut F2_tool97
    add(f2_tool97_1.part, mode=Mode.SUBTRACT)


with BuildPart() as f2_tool108:
    # F2_s109 → F2_t110 (new body)
    with BuildSketch(Plane(origin=(-14.3735226281, 8.2985571585, 0), x_dir=(0, 0, 1), z_dir=(0.8660254038, -0.5, 0))):
        with BuildLine():
            ThreePointArc((1.016, 2.25), (0.2975795103, 1.9524204897), (0, 1.234))
            Line((0, 1.234), (0, 2.25))
            Line((0, 2.25), (1.016, 2.25))
        make_face()
    extrude(amount=F2_T110_DEPTH)

    split(bisect_by=Plane.YZ.offset(-4.5), keep=Keep.TOP)


with BuildPart() as f2_tool112:
    # F2_s113 → F2_t114 (new body)
    with BuildSketch(Plane.XZ.offset(-2.54)):
        with BuildLine():
            ThreePointArc((-4.5, 1.016), (-4.2024204897, 0.2975795103), (-3.484, 0))
            Line((-3.484, 0), (-4.5, 0))
            Line((-4.5, 0), (-4.5, 1.016))
        make_face()
    extrude(amount=F2_T114_DEPTH)

    split(bisect_by=Plane(origin=(-1.125, -1.9485571585, 0), x_dir=(0, 0, 1), z_dir=(0.5, 0.8660254038, 0)), keep=Keep.TOP)


with BuildPart() as f2_tool108_1:
    add(f2_tool108.part)

    # F2_t116: intersect F2_tool112
    add(f2_tool112.part, mode=Mode.INTERSECT)


with BuildPart() as f1_16:
    add(f1_15.part)

    # F2_t106: cut F2_tool108
    add(f2_tool108_1.part, mode=Mode.SUBTRACT)


with BuildPart() as f2_tool119:
    # F2_s120 → F2_t121 (new body)
    with BuildSketch(Plane.XZ.offset(12.7)):
        with BuildLine():
            ThreePointArc((4.5, 1.016), (4.2024204897, 0.2975795103), (3.484, 0))
            Line((3.484, 0), (4.5, 0))
            Line((4.5, 0), (4.5, 1.016))
        make_face()
    extrude(amount=-F2_T121_DEPTH)

    split(bisect_by=Plane(origin=(1.125, -1.9485571585, 0), x_dir=(0, 0, 1), z_dir=(-0.5, 0.8660254038, 0)), keep=Keep.TOP)


with BuildPart() as f2_tool123:
    # F2_s124 → F2_t125 (new body)
    with BuildSketch(Plane(origin=(1.1752954744, 0.6785571585, 0), x_dir=(0, 0, 1), z_dir=(0.8660254038, 0.5, 0))):
        with BuildLine():
            ThreePointArc((1.016, 2.25), (0.2975795103, 1.9524204897), (0, 1.234))
            Line((0, 1.234), (0, 2.25))
            Line((0, 2.25), (1.016, 2.25))
        make_face()
    extrude(amount=F2_T125_DEPTH)

    split(bisect_by=Plane.YZ.offset(4.5), keep=Keep.BOTTOM)


with BuildPart() as f2_tool119_1:
    add(f2_tool119.part)

    # F2_t127: intersect F2_tool123
    add(f2_tool123.part, mode=Mode.INTERSECT)


with BuildPart() as f1_17:
    add(f1_16.part)

    # F2_t117: cut F2_tool119
    add(f2_tool119_1.part, mode=Mode.SUBTRACT)


with BuildPart() as f2_tool130:
    # F2_s131 → F2_t132 (new body)
    with BuildSketch(Plane(origin=(14.3735226281, 8.2985571585, 0), x_dir=(0, 0, 1), z_dir=(-0.8660254038, -0.5, 0))):
        with BuildLine():
            ThreePointArc((1.016, 6.75), (0.2975795103, 6.4524204897), (0, 5.734))
            Line((0, 5.734), (0, 6.75))
            Line((0, 6.75), (1.016, 6.75))
        make_face()
    extrude(amount=F2_T132_DEPTH)

    split(bisect_by=Plane(origin=(3.375, 5.8456714755, 0), x_dir=(0, 0, 1), z_dir=(-0.5, -0.8660254038, 0)), keep=Keep.TOP)


with BuildPart() as f2_tool134:
    # F2_s135 → F2_t136 (new body)
    with BuildSketch(Plane(origin=(-1.1752954744, 0.6785571585, 0), x_dir=(0, 0, 1), z_dir=(-0.8660254038, 0.5, 0))):
        with BuildLine():
            ThreePointArc((1.016, 6.75), (0.2975795103, 6.4524204897), (0, 5.734))
            Line((0, 5.734), (0, 6.75))
            Line((0, 6.75), (1.016, 6.75))
        make_face()
    extrude(amount=F2_T136_DEPTH)

    split(bisect_by=Plane(origin=(-3.375, 5.8456714755, 0), x_dir=(0, 0, 1), z_dir=(0.5, -0.8660254038, 0)), keep=Keep.TOP)


with BuildPart() as f2_tool130_1:
    add(f2_tool130.part)

    # F2_t138: intersect F2_tool134
    add(f2_tool134.part, mode=Mode.INTERSECT)


with BuildPart() as f1_18:
    add(f1_17.part)

    # F2_t128: cut F2_tool130
    add(f2_tool130_1.part, mode=Mode.SUBTRACT)


solid = f1_18.part
